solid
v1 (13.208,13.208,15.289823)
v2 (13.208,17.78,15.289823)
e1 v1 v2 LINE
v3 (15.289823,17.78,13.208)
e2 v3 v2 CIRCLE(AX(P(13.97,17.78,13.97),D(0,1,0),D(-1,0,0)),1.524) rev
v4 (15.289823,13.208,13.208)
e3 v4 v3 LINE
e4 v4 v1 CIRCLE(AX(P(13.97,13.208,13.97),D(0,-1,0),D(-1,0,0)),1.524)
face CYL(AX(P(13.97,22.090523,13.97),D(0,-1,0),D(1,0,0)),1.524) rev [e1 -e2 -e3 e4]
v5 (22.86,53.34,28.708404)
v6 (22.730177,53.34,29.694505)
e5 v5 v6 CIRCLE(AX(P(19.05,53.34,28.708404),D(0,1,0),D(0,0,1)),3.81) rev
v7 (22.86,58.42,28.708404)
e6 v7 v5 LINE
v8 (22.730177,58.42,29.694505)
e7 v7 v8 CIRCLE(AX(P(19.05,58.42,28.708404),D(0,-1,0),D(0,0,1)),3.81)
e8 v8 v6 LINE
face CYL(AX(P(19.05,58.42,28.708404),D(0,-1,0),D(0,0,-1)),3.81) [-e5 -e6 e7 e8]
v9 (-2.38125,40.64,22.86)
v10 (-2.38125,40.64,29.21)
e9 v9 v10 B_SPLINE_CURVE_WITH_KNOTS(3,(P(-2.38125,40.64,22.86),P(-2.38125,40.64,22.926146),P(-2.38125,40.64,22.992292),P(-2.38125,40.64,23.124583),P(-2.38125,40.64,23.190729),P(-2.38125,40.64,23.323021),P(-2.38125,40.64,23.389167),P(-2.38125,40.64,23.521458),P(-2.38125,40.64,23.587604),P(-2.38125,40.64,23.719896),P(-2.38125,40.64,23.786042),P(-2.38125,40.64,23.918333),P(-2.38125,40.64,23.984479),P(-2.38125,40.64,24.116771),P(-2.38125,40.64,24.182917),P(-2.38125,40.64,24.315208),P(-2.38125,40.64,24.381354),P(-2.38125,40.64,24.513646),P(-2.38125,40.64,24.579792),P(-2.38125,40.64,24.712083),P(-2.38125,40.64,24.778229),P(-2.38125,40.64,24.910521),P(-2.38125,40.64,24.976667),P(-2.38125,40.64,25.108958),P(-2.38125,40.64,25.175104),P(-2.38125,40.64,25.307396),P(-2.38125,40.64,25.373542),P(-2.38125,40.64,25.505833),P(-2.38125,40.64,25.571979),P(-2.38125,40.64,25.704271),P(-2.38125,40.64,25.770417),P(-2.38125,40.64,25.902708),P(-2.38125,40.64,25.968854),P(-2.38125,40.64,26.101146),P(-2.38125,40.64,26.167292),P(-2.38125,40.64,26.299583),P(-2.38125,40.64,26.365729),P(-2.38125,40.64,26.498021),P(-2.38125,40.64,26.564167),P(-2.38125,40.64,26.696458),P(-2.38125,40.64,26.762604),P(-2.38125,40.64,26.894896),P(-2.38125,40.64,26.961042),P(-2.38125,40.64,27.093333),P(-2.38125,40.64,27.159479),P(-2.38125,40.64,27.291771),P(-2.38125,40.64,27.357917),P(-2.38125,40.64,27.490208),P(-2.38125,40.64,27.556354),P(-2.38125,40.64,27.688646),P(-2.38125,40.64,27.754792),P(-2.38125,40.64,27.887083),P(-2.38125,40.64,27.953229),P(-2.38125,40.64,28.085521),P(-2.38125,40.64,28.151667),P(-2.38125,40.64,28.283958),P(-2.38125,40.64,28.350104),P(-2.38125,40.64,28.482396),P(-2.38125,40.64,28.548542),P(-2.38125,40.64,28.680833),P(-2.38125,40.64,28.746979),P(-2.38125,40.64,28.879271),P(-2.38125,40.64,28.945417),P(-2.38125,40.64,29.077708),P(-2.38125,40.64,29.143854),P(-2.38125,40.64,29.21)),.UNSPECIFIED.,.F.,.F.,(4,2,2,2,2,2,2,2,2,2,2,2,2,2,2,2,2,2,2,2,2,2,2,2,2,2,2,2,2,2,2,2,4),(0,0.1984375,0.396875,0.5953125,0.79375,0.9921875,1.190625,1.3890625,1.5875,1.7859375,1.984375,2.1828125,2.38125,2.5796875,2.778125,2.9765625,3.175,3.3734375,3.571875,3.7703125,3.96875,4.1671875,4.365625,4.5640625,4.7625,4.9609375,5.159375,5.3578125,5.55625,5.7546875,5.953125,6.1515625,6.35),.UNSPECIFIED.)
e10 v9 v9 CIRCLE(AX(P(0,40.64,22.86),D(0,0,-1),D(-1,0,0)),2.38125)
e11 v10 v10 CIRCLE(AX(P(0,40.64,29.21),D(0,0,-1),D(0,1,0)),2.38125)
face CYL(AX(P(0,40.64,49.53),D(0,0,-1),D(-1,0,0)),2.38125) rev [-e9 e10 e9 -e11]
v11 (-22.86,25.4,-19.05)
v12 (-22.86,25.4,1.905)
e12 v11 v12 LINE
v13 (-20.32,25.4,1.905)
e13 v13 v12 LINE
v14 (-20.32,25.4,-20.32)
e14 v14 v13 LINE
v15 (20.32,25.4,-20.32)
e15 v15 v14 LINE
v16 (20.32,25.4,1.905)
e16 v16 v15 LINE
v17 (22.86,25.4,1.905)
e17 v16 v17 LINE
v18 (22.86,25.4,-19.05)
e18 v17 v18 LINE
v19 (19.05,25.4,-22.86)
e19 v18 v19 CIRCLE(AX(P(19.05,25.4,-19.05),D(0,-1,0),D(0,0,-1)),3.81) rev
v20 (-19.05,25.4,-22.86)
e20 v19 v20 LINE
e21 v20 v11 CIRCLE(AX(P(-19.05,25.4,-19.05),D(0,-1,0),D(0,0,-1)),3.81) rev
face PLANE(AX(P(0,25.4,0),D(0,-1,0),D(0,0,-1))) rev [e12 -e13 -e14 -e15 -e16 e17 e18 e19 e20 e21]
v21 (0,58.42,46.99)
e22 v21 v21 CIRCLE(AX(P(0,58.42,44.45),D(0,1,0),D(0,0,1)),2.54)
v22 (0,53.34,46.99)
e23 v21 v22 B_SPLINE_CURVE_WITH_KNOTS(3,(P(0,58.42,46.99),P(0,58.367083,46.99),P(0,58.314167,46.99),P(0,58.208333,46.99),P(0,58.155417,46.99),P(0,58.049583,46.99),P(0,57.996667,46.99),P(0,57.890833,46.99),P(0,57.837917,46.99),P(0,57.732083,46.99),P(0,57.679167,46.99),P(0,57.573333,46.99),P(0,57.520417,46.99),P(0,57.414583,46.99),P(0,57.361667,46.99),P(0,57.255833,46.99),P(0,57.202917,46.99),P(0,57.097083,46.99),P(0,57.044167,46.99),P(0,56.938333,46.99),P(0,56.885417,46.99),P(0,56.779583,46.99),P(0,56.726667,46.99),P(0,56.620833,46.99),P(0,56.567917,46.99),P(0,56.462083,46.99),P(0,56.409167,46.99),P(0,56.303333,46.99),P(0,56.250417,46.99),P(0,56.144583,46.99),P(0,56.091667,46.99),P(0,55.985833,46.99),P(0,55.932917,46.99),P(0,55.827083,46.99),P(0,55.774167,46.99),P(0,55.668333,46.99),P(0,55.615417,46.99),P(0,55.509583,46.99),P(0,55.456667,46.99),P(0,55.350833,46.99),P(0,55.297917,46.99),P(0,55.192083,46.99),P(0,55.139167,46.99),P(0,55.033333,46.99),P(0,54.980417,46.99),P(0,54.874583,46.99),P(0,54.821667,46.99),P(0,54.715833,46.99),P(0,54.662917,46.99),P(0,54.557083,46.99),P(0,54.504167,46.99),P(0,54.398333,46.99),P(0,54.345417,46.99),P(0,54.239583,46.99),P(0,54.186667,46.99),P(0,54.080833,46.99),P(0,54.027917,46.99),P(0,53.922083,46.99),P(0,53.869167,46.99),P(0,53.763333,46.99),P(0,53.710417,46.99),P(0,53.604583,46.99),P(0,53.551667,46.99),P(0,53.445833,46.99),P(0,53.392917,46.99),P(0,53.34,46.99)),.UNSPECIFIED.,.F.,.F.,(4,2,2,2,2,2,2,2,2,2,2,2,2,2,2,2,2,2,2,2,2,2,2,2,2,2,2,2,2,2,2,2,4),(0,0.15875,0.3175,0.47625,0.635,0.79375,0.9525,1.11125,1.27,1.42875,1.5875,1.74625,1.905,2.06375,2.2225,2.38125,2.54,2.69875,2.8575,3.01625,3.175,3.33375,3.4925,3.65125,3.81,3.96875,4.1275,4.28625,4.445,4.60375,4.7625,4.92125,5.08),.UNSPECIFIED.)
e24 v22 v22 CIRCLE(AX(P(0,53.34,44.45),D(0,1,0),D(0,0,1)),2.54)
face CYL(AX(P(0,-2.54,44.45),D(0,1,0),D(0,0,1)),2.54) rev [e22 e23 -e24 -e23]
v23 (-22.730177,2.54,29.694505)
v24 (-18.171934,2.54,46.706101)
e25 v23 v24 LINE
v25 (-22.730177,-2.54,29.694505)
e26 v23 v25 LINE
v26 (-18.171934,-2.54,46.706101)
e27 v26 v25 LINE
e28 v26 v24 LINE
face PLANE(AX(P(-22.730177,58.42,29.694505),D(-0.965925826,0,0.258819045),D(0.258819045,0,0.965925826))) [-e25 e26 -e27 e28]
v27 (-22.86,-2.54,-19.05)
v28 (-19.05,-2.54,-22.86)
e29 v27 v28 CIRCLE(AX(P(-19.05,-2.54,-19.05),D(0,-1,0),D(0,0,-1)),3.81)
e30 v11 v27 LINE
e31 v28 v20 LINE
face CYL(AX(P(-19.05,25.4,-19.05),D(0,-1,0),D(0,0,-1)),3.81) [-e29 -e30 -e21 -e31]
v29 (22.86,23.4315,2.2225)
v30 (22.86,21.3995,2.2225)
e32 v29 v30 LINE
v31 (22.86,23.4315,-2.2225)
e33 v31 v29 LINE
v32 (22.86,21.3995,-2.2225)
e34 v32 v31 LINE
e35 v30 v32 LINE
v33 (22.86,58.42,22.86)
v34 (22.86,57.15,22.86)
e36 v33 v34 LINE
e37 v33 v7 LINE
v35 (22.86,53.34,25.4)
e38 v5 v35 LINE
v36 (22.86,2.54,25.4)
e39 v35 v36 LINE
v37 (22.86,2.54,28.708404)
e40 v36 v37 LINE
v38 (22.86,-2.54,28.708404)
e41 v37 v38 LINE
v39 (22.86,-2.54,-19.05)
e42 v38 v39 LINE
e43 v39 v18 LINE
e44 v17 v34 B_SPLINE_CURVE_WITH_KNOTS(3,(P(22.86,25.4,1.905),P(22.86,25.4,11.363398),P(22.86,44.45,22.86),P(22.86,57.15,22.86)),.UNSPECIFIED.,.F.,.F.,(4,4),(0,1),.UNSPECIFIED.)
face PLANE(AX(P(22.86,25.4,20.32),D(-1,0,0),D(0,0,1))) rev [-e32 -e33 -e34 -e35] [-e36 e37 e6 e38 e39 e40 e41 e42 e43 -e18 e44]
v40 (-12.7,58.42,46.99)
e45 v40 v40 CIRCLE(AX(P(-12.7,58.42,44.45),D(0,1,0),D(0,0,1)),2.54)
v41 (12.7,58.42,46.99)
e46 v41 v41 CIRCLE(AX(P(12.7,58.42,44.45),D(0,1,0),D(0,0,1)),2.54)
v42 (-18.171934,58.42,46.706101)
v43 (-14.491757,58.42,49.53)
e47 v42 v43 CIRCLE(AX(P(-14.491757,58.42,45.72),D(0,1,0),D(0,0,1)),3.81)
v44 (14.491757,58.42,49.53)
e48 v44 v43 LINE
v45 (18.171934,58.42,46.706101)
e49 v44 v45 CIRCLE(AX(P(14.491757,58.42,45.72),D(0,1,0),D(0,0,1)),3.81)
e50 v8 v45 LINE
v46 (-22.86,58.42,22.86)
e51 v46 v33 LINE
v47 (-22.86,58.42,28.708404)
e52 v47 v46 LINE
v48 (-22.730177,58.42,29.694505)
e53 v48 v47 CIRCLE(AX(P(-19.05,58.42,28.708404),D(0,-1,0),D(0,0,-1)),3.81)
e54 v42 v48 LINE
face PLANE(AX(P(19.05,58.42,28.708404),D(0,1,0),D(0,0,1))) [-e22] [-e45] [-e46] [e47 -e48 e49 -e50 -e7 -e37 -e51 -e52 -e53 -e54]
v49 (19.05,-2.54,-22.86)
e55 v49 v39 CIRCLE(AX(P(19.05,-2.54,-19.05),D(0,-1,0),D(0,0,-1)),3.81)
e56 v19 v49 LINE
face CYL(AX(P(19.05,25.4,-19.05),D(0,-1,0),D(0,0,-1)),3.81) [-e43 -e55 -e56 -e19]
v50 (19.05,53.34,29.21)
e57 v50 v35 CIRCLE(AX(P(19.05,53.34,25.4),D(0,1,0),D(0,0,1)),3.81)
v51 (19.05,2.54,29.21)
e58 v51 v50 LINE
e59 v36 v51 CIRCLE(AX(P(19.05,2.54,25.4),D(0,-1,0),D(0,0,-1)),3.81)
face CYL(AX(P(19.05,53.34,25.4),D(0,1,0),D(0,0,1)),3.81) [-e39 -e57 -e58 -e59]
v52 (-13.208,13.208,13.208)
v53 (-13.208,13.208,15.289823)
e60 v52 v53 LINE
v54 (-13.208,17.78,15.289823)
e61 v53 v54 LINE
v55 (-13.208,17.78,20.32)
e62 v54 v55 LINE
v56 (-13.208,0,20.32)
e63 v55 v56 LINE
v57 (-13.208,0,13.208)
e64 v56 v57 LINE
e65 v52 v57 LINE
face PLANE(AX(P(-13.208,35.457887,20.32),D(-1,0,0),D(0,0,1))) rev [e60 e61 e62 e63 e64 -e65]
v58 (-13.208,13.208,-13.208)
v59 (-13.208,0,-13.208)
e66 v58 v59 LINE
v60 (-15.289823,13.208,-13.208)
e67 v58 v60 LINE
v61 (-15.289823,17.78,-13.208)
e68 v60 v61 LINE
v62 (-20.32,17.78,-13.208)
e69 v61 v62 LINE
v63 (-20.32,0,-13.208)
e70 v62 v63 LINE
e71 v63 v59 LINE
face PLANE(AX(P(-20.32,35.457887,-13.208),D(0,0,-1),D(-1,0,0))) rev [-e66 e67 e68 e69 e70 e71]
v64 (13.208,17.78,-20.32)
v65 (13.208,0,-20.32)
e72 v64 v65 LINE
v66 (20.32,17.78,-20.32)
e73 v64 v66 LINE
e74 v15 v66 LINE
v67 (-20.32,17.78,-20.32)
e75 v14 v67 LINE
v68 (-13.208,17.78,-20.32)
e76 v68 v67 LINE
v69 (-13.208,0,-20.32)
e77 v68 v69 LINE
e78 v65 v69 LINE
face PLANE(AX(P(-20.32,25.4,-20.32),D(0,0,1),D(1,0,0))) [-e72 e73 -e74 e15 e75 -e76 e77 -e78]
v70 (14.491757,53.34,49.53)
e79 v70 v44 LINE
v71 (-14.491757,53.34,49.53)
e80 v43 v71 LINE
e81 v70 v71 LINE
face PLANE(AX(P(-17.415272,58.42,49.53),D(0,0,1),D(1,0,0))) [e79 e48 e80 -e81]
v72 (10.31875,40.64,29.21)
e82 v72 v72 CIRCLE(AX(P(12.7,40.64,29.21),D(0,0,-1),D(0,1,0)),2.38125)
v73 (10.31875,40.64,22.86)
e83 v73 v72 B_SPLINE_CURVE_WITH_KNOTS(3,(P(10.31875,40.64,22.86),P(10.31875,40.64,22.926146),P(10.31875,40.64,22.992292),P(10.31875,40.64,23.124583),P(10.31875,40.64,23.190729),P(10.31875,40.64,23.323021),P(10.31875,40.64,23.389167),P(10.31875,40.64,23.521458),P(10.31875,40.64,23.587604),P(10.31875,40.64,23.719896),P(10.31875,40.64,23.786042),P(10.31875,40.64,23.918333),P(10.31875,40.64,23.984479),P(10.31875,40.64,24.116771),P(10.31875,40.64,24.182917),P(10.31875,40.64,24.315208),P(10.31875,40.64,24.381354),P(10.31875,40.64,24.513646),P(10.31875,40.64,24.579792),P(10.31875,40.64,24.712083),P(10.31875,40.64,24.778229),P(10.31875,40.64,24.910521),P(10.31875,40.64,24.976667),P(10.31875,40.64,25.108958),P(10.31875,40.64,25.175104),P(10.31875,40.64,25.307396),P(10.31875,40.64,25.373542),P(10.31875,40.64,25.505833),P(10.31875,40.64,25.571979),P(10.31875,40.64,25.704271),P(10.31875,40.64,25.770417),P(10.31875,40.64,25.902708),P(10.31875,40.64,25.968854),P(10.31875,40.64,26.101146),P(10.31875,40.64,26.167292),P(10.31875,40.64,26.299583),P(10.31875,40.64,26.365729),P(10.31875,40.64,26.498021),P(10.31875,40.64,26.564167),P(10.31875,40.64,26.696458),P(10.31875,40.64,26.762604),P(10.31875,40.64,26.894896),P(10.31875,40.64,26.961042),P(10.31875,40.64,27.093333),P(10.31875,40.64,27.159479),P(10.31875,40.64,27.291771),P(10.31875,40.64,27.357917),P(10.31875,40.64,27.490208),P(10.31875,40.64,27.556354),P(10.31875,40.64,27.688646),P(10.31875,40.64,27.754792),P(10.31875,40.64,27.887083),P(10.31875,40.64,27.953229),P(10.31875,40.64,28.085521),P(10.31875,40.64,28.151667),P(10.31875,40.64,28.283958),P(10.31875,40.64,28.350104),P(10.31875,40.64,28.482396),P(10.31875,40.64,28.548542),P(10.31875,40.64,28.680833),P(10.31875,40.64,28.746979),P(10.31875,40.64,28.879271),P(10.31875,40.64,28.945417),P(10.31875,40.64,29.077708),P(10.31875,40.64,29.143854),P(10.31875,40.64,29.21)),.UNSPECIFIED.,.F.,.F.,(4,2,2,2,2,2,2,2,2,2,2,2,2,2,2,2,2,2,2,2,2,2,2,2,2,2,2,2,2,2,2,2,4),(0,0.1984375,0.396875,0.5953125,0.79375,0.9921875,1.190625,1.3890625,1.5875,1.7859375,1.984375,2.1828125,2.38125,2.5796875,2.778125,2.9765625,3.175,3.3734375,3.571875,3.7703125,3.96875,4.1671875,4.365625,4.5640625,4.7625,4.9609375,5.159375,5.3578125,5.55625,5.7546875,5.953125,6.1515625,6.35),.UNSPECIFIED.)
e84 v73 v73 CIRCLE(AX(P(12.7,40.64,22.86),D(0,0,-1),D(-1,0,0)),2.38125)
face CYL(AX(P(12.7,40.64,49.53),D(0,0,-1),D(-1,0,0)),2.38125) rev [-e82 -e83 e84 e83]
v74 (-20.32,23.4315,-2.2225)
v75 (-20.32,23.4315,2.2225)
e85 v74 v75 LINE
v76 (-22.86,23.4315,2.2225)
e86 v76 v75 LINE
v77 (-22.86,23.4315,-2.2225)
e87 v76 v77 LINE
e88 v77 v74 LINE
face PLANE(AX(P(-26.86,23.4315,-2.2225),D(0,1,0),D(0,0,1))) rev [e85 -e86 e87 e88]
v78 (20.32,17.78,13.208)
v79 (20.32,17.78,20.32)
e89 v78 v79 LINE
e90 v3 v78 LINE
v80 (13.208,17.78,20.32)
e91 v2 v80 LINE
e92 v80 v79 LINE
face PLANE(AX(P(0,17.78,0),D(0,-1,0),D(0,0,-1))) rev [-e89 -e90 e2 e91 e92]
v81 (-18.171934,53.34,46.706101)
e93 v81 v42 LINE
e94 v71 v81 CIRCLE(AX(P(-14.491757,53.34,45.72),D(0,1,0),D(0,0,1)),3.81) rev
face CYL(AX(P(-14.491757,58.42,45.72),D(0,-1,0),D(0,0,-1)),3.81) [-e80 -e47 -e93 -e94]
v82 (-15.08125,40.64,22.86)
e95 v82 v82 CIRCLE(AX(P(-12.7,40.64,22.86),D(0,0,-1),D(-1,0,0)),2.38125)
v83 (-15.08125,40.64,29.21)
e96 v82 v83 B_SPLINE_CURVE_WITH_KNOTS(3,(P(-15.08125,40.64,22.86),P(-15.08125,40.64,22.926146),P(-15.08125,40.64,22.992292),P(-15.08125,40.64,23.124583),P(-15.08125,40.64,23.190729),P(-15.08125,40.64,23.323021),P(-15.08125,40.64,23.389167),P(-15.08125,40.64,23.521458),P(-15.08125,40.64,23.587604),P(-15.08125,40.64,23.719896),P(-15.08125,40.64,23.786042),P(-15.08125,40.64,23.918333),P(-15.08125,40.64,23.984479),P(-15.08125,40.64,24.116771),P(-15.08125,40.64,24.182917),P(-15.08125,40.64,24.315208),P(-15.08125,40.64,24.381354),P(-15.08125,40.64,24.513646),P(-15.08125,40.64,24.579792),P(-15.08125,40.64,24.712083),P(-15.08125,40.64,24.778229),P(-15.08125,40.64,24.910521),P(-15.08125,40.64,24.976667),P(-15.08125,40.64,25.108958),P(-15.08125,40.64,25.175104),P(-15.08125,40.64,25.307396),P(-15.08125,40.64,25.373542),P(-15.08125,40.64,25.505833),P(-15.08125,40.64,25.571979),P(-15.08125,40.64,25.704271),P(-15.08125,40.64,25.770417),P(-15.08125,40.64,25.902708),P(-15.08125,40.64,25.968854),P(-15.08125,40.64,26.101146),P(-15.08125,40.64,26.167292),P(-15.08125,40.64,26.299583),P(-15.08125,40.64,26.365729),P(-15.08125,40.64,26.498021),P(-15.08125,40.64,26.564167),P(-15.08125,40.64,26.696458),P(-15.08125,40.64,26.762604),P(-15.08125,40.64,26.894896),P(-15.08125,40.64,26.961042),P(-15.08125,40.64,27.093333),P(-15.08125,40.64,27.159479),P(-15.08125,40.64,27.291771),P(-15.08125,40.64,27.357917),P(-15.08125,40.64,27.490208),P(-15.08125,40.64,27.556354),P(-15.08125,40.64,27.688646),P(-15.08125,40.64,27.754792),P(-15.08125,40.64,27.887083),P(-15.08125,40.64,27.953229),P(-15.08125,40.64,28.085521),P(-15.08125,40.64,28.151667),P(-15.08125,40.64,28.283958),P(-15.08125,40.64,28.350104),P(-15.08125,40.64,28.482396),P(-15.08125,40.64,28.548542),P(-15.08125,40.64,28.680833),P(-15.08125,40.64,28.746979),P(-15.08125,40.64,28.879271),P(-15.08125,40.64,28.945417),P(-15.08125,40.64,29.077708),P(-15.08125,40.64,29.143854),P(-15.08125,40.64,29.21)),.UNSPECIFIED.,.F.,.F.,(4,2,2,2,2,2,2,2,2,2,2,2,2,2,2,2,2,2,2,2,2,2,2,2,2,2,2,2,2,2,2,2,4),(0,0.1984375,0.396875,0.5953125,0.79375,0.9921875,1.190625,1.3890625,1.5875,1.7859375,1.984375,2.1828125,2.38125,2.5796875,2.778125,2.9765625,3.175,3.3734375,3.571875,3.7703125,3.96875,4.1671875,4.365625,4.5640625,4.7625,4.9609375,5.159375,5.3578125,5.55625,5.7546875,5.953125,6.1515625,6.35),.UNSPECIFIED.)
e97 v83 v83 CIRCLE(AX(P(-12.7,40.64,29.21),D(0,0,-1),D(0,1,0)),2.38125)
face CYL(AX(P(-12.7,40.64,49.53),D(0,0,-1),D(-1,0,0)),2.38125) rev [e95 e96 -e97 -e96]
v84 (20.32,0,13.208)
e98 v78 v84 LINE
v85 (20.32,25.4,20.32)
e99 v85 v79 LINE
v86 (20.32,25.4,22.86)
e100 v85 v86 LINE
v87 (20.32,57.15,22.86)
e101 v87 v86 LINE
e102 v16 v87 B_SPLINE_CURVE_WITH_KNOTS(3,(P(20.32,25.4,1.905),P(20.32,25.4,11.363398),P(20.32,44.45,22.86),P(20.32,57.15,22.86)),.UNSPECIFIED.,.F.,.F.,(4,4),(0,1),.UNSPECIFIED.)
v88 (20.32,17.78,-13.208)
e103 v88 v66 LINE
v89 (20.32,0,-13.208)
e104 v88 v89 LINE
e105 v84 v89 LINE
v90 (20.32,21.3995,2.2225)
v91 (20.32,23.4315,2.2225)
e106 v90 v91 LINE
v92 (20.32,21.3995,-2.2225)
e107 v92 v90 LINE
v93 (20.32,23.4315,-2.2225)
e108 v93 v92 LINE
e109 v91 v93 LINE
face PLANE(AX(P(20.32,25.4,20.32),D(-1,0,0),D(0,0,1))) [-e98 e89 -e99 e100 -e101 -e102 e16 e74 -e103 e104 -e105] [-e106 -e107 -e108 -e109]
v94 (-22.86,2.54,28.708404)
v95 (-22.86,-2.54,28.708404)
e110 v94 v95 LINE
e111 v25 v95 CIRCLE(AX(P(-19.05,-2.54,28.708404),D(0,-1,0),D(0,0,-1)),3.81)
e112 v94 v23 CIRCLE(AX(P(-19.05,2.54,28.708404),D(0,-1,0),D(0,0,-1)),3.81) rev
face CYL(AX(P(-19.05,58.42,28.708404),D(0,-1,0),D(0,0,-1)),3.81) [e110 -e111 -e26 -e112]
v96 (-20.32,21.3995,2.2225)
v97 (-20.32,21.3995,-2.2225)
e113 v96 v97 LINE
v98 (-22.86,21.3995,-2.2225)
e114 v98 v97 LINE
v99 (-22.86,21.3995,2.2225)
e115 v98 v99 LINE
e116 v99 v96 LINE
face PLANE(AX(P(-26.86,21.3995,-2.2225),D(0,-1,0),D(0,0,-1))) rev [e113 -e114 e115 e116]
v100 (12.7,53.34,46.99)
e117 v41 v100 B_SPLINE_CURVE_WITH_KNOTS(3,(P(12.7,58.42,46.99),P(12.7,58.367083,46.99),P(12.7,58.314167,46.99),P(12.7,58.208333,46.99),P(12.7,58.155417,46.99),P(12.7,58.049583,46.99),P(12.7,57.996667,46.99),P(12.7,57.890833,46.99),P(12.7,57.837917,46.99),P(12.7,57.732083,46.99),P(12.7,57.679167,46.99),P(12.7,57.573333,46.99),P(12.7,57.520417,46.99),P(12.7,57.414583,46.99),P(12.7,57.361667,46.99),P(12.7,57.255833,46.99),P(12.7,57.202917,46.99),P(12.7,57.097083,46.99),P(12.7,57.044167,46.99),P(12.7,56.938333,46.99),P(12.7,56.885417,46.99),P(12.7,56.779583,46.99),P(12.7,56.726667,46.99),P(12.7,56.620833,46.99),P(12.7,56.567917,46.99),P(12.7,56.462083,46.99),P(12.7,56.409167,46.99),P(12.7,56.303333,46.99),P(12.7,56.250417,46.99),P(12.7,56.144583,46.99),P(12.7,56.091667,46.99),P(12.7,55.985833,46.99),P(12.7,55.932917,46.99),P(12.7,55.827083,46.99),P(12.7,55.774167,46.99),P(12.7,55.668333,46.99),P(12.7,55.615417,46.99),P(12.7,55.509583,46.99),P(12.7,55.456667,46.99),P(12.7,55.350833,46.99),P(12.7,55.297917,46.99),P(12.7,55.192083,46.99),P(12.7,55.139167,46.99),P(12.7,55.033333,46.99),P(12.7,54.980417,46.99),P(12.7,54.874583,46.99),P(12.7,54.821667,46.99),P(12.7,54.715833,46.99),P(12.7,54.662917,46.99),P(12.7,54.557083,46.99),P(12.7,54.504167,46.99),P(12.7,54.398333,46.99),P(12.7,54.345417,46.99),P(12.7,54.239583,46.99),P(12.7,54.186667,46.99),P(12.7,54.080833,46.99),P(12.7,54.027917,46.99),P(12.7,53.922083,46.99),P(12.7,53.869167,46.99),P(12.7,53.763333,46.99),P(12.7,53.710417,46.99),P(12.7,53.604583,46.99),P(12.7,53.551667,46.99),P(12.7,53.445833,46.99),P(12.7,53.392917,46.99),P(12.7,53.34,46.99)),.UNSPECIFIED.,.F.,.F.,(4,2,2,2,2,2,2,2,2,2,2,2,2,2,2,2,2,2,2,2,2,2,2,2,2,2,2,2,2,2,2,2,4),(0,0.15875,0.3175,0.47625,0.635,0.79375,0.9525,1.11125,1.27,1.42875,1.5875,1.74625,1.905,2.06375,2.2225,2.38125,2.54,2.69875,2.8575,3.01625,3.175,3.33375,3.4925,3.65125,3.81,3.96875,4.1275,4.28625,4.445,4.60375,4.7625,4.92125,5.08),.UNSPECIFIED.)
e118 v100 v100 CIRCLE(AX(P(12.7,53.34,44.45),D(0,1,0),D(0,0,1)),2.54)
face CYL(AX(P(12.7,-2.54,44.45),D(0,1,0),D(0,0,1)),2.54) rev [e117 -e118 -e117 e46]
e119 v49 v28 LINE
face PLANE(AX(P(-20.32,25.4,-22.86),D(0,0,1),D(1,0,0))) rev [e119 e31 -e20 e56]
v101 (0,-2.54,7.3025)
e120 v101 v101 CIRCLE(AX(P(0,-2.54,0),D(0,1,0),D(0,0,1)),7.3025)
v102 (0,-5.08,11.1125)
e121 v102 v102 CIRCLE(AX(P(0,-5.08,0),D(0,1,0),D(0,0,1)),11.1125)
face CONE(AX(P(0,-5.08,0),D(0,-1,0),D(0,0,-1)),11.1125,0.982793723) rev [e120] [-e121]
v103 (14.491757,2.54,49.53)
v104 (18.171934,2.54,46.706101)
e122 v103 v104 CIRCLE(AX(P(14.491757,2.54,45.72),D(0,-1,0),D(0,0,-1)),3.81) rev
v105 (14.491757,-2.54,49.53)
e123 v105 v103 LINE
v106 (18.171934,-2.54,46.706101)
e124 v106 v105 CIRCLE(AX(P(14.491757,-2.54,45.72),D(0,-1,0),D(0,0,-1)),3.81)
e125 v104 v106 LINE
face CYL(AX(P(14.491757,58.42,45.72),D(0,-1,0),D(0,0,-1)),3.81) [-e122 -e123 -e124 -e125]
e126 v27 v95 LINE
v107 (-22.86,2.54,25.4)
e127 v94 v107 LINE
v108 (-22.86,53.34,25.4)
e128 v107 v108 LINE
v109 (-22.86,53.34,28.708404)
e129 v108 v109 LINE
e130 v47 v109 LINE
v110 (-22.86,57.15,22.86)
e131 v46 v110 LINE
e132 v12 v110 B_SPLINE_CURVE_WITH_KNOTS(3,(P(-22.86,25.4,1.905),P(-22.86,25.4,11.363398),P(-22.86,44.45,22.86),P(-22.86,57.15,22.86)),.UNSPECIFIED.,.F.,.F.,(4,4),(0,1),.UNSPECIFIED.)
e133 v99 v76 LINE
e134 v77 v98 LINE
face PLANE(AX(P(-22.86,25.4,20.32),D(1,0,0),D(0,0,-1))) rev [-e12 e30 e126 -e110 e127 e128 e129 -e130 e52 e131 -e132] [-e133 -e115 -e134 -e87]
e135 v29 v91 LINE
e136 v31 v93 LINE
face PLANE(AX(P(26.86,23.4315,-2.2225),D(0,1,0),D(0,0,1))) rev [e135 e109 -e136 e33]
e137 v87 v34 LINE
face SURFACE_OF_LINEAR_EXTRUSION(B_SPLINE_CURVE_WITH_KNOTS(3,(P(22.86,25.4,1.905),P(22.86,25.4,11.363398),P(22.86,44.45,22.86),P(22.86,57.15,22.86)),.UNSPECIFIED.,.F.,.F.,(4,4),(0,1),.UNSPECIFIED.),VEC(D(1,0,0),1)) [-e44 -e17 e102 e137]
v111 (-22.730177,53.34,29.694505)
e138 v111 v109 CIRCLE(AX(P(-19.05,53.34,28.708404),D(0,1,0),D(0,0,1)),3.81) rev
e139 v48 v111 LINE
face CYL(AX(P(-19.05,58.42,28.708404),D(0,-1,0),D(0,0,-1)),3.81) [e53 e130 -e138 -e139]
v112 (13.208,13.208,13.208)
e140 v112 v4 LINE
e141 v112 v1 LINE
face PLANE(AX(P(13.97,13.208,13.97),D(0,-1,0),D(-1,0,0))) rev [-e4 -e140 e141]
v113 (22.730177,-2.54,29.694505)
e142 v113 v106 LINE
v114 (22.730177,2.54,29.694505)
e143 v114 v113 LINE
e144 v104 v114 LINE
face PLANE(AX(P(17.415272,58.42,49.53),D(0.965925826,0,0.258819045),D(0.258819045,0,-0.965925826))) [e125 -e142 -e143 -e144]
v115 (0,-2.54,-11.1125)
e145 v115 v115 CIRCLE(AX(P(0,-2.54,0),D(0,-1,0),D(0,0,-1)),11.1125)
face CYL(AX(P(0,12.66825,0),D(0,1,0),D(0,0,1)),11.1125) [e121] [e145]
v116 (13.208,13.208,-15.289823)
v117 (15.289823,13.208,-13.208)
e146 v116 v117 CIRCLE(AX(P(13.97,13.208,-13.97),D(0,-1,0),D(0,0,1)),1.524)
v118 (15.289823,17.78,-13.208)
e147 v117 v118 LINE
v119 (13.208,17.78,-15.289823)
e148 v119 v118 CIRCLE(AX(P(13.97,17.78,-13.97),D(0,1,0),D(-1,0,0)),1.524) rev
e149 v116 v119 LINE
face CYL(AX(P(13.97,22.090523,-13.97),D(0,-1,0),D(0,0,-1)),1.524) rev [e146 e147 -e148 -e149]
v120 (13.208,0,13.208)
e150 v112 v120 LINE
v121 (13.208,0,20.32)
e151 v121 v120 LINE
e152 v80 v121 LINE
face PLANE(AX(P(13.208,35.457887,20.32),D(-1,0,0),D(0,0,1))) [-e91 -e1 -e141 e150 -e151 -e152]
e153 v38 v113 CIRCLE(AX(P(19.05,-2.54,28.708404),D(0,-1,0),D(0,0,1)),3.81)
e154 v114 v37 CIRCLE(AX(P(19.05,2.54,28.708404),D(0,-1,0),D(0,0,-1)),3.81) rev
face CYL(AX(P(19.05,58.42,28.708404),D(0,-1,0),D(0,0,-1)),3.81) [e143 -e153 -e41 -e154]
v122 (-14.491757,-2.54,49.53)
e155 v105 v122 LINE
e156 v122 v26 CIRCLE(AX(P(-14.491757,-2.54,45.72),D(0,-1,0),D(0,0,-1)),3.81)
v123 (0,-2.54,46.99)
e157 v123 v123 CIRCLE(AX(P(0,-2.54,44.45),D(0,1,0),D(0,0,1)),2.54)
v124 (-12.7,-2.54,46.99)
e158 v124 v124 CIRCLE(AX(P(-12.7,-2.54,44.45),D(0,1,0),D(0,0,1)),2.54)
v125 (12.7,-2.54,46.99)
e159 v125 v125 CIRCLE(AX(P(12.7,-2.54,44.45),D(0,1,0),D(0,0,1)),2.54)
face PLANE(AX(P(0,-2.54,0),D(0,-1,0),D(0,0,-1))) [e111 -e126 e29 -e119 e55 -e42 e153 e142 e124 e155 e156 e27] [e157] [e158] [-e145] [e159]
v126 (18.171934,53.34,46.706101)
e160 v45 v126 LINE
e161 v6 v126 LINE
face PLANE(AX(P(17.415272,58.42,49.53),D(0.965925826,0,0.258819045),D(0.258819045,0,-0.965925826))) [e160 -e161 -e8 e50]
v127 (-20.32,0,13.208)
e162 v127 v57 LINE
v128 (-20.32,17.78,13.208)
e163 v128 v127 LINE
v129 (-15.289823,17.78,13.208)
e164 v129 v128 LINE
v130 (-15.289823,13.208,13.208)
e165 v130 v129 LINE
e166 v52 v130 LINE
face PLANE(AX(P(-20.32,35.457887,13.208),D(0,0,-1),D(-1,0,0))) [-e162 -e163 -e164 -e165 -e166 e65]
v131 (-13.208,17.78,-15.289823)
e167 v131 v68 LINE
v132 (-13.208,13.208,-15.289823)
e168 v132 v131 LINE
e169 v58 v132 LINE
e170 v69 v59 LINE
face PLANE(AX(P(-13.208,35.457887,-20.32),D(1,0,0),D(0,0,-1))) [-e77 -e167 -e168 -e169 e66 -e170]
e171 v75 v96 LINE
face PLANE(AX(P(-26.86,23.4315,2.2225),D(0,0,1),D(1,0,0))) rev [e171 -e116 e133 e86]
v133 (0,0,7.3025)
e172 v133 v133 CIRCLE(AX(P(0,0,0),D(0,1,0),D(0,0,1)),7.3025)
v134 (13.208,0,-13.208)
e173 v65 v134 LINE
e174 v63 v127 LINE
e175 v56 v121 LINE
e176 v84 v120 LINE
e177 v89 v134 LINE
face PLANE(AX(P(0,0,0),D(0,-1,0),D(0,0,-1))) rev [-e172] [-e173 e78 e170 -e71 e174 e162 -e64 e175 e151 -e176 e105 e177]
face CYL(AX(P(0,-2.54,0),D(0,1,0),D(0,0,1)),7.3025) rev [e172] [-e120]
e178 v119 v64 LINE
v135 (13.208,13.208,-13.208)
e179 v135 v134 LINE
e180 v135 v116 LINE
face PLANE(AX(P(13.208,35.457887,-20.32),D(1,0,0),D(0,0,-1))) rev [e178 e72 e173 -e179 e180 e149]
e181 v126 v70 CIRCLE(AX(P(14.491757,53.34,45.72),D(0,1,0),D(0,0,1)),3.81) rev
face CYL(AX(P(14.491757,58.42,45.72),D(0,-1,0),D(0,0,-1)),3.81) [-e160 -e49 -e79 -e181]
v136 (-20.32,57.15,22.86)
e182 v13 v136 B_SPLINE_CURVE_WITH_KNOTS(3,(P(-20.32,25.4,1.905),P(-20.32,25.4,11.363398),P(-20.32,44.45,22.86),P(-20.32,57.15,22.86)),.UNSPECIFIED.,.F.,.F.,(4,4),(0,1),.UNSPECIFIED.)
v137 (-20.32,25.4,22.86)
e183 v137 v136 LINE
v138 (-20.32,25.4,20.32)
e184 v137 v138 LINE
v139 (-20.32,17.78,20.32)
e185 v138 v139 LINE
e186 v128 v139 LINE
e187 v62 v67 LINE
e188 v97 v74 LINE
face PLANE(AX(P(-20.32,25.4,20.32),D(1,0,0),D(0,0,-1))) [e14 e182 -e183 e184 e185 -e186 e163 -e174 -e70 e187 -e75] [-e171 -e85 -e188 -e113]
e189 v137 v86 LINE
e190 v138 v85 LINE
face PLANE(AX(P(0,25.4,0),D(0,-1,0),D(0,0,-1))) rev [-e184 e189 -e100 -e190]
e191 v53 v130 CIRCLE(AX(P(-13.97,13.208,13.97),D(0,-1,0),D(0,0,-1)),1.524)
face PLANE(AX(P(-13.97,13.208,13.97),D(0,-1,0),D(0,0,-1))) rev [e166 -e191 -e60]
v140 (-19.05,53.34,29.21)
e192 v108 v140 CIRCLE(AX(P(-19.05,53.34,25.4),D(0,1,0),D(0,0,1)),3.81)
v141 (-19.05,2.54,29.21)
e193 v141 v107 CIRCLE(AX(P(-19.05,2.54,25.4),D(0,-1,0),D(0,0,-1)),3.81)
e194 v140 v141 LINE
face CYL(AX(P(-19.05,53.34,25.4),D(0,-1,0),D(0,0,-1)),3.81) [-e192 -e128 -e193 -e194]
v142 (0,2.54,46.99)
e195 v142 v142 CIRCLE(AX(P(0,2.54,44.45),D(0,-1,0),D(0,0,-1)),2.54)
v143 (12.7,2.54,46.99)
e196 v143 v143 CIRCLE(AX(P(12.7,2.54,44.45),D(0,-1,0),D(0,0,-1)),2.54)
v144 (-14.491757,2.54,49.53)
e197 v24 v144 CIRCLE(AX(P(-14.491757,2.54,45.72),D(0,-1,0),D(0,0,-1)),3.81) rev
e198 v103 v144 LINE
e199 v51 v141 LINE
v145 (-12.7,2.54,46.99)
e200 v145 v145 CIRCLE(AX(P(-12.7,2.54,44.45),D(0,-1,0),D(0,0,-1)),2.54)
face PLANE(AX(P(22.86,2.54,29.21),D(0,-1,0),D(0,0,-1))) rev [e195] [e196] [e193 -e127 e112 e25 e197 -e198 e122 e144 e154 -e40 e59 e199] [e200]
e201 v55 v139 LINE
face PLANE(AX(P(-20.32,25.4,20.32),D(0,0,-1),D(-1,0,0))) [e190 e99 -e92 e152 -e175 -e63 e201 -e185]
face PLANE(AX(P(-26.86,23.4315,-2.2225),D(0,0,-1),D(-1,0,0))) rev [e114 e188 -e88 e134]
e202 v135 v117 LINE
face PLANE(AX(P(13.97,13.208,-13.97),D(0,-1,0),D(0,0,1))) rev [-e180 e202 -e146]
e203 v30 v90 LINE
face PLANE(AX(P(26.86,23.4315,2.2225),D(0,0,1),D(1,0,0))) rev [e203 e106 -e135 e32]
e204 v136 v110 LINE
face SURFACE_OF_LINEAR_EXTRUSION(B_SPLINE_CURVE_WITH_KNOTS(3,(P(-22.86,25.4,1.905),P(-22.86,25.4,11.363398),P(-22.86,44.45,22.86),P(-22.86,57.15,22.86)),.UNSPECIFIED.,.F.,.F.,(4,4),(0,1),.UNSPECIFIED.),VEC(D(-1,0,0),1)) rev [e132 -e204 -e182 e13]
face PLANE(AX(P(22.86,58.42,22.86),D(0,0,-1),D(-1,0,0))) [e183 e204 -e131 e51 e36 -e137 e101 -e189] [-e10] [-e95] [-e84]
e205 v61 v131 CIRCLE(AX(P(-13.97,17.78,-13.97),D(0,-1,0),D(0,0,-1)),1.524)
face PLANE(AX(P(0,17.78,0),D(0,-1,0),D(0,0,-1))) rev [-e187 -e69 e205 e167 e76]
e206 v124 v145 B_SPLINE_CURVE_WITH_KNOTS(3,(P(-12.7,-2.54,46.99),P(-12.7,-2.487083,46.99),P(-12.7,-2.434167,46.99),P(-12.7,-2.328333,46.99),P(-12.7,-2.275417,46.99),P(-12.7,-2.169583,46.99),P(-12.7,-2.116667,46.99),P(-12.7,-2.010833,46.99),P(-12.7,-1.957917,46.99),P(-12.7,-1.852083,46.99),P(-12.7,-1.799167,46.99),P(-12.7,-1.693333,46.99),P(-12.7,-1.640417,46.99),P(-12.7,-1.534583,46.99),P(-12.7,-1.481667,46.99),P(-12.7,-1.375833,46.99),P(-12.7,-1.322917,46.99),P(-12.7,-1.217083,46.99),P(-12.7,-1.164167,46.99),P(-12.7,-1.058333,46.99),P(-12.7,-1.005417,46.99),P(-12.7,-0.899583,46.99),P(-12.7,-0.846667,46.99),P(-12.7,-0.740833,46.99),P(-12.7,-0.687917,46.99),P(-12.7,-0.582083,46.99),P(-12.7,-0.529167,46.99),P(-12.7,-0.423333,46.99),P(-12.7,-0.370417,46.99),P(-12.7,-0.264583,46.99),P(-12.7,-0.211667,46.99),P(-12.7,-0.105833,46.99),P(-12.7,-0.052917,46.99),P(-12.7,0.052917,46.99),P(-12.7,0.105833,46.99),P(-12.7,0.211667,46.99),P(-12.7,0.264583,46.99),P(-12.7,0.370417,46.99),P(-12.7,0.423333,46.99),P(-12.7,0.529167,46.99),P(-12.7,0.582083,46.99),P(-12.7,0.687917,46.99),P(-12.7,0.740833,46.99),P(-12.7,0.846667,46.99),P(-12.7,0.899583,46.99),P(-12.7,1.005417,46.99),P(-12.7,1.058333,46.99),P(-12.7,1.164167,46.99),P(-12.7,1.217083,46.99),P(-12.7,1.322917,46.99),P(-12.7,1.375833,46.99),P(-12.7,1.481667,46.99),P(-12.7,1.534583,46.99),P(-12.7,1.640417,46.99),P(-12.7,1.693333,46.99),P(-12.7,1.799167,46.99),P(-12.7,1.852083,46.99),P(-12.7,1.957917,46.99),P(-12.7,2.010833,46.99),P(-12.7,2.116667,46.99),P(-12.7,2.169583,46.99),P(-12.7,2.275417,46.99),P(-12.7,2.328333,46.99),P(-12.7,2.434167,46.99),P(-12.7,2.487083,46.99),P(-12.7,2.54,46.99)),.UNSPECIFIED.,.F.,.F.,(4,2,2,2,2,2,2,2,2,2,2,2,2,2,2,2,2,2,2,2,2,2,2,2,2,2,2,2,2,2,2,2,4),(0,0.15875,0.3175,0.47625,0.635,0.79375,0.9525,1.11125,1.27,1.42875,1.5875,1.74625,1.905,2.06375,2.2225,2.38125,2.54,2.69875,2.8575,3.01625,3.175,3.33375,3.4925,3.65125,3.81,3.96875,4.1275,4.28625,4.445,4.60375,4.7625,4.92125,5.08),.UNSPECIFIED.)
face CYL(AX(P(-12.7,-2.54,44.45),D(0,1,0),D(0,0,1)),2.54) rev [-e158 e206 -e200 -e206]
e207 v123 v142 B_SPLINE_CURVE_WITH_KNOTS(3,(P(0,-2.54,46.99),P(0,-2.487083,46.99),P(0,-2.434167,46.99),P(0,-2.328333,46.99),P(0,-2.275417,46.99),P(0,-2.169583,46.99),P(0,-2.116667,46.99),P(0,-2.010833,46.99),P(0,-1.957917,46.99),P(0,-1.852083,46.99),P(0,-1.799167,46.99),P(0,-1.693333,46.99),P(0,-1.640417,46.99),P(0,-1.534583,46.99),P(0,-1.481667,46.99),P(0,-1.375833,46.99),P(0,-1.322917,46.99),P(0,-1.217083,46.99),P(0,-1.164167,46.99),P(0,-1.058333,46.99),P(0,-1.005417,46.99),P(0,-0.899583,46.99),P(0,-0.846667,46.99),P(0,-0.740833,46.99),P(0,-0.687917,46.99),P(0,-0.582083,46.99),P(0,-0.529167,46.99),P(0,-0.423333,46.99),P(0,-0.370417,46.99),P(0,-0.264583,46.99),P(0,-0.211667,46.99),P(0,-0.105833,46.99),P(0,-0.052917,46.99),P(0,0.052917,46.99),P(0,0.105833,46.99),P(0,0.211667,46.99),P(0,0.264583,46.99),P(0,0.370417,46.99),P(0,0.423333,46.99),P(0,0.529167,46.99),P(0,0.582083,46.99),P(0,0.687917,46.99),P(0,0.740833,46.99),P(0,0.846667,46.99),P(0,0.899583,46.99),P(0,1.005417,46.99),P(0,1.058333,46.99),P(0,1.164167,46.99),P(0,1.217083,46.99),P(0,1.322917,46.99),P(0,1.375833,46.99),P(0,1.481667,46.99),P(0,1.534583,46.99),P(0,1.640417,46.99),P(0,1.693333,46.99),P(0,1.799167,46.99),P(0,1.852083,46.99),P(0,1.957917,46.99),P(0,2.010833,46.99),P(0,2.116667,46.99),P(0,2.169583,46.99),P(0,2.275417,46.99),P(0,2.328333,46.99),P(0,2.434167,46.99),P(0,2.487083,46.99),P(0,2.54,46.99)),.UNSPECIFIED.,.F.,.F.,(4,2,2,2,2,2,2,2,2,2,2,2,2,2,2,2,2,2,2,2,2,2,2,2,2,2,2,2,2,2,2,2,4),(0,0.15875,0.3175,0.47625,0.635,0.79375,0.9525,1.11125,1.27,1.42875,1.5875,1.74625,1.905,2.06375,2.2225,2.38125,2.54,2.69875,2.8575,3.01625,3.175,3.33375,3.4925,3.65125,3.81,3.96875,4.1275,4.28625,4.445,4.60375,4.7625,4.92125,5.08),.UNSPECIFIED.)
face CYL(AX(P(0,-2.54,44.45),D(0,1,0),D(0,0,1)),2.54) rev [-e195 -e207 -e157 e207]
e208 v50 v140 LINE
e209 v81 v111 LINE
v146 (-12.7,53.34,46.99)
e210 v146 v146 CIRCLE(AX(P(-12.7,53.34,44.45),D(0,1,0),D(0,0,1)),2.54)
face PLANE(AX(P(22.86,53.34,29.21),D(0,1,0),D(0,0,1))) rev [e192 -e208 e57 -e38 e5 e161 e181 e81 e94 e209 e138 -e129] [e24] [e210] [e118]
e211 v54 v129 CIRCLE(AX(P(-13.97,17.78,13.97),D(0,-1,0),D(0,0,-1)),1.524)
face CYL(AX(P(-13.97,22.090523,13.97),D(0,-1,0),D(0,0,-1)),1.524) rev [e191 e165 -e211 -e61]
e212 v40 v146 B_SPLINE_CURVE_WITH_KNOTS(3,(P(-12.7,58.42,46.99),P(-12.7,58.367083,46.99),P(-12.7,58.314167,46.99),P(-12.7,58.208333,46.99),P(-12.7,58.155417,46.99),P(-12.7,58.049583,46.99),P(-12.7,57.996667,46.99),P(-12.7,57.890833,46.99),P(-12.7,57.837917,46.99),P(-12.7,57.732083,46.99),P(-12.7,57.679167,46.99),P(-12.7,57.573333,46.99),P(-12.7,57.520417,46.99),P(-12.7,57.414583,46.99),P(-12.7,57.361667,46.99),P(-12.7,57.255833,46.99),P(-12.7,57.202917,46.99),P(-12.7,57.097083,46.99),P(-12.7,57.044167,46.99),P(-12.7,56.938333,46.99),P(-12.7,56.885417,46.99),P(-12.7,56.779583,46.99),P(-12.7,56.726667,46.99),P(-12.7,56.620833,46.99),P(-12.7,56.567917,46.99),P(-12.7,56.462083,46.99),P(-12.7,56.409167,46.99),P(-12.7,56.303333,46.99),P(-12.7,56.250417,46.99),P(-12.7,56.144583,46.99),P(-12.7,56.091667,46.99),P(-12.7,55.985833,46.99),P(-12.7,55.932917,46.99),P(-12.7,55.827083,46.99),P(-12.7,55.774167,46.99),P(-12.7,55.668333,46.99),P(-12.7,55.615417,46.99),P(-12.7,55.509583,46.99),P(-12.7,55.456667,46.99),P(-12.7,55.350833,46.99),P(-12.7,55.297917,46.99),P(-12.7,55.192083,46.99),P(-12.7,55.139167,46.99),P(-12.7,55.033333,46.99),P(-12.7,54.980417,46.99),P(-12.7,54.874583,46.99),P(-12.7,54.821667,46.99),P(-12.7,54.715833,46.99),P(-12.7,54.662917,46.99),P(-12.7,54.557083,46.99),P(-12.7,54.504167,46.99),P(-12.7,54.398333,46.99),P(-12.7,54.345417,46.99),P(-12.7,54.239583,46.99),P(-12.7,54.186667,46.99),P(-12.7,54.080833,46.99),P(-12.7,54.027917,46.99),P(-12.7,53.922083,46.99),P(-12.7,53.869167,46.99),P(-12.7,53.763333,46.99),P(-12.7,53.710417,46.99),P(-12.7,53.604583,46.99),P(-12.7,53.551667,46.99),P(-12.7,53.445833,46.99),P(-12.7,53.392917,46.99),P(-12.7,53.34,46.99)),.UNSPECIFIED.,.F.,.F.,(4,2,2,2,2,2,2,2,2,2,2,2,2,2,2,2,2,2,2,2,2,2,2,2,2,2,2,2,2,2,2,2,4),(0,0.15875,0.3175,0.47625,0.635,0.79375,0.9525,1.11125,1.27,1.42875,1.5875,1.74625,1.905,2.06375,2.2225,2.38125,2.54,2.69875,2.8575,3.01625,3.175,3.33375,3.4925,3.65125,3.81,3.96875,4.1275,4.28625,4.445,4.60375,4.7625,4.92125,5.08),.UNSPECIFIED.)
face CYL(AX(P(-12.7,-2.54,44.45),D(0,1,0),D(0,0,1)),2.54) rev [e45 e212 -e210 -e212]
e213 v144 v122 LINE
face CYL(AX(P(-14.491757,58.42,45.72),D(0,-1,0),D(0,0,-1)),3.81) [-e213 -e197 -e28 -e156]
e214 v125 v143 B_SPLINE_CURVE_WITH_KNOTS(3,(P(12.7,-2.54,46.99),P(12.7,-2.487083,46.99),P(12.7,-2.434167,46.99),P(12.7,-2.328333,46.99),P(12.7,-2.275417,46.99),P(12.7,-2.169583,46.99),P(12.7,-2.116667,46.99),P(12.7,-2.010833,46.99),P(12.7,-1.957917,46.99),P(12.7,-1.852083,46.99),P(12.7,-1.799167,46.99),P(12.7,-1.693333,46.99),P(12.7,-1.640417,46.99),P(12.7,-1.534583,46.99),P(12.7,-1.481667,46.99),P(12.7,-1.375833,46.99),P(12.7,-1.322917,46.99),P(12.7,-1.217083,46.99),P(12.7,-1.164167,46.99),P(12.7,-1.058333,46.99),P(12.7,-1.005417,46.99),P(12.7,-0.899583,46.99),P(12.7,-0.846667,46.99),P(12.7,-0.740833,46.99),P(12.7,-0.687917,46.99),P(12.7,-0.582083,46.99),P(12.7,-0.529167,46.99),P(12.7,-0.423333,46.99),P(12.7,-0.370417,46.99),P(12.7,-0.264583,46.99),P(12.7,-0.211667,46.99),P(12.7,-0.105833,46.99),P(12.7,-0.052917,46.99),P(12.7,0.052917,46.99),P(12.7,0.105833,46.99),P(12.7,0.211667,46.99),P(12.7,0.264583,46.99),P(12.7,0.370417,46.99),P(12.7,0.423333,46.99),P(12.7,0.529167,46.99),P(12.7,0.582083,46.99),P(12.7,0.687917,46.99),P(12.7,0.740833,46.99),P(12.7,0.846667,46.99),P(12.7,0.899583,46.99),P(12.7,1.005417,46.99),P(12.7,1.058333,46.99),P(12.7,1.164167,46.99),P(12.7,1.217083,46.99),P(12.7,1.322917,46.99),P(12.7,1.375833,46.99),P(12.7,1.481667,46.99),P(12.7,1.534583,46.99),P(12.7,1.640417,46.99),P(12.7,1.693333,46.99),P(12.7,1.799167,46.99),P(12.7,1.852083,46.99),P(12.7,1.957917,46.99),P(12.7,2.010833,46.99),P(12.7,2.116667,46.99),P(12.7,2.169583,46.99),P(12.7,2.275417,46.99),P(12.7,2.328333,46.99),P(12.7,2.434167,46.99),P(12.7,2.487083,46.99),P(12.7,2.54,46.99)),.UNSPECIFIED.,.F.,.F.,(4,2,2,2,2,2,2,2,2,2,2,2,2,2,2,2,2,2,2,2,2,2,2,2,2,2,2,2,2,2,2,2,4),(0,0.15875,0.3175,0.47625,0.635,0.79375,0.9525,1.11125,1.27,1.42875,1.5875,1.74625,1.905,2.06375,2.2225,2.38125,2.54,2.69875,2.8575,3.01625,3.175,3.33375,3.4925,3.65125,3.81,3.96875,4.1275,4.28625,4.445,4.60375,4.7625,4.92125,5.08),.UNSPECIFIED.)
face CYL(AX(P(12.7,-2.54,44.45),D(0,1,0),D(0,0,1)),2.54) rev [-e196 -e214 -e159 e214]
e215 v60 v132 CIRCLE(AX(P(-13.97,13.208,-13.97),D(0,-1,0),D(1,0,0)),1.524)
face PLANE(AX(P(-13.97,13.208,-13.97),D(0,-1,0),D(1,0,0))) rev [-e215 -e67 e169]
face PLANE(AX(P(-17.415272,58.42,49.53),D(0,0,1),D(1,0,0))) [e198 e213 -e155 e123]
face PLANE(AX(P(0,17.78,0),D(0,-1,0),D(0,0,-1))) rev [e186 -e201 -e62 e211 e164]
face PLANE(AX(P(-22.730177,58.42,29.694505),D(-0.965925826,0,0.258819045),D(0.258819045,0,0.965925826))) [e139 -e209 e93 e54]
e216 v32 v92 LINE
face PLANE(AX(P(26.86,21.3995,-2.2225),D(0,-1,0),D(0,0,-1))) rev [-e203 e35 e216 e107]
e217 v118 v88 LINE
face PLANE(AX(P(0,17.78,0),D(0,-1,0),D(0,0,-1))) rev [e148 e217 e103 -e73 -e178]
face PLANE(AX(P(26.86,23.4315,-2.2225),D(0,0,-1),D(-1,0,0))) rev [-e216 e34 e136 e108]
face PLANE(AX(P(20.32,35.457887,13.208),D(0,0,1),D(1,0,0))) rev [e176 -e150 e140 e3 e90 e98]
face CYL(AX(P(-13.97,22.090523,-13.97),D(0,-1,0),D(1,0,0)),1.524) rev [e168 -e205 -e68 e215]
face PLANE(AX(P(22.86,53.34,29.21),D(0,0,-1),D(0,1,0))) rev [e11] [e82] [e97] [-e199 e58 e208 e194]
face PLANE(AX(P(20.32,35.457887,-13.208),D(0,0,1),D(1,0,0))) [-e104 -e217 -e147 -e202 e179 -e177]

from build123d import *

# Parameters (mm, degrees)
SKETCH1_W           = 40.64
SKETCH1_H           = 40.64
BOSS_EXTRUDE1_DEPTH = 25.4
SHELL1_T            = 2.54
SKETCH2_W           = 7.112
SKETCH2_H           = 7.112
BOSS_EXTRUDE2_DEPTH = 17.78
BOSS_EXTRUDE3_DEPTH = 60.96
SKETCH5_W           = 20.32
SKETCH5_H           = 50.8
CUT_EXTRUDE1_DEPTH  = 90.198854813
SKETCH6_R           = 2.54
CUT_EXTRUDE2_DEPTH  = 82.804169209
FILLET1_R           = 3.81
SKETCH10_R          = 1.524
CUT_EXTRUDE4_DEPTH  = 4.572
CIRPATTERN1_COUNT   = 4
SKETCH11_R          = 7.3025
CUT_EXTRUDE5_DEPTH  = 80.929324406
RIB1_START          = -2.54
RIB1_DEPTH          = 2.54
SKETCH19_R          = 2.38125
CUT_EXTRUDE6_DEPTH  = 78.625990598
SKETCH20_W          = 2.032
SKETCH20_H          = 4.445


with BuildPart() as part:
    # Sketch1 → Boss-Extrude1 (new body)
    with BuildSketch(Plane(origin=(0, 0, 0), x_dir=(1, 0, 0), z_dir=(0, 1, 0))):
        Rectangle(SKETCH1_W, SKETCH1_H)
    extrude(amount=BOSS_EXTRUDE1_DEPTH)

    # Shell1
    shell1_openings = [part.faces().sort_by_distance(p)[0] for p in [
        (0, 25.4, 0),
    ]]
    offset(amount=SHELL1_T, openings=shell1_openings, kind=Kind.INTERSECTION)

    # Sketch2 → Boss-Extrude2 (add)
    with BuildSketch(Plane(origin=(0, 0, 0), x_dir=(1, 0, 0), z_dir=(0, 1, 0))):
        with Locations((-16.764, 16.764)):
            Rectangle(SKETCH2_W, SKETCH2_H)
    boss_extrude2 = extrude(amount=BOSS_EXTRUDE2_DEPTH)

    # Sketch3 → Boss-Extrude3 (add)
    with BuildSketch(Plane.XZ.offset(2.54)):
        with BuildLine():
            Line((-22.730177398, 29.694504546), (-17.41527241, 49.53))
            Line((-17.41527241, 49.53), (17.41527241, 49.53))
            Line((17.41527241, 49.53), (22.730177398, 29.694504546))
            ThreePointArc((22.730177398, 29.694504546), (22.827404922, 29.205708777), (22.86, 28.708403984))
            Line((22.86, 28.708403984), (22.86, 22.86))
            Line((22.86, 22.86), (-22.86, 22.86))
            Line((-22.86, 22.86), (-22.86, 28.708403984))
            ThreePointArc((-22.86, 28.708403984), (-22.827404922, 29.205708777), (-22.730177398, 29.694504546))
        make_face()
    extrude(amount=-BOSS_EXTRUDE3_DEPTH)

    # Sketch5 → Cut-Extrude1 (cut, through all)
    with BuildSketch(Plane.ZY.offset(22.86)):
        with Locations((39.37, 27.94)):
            Rectangle(SKETCH5_W, SKETCH5_H)
    extrude(amount=-CUT_EXTRUDE1_DEPTH, mode=Mode.SUBTRACT)

    # Sketch6 → Cut-Extrude2 (cut, through all)
    with BuildSketch(Plane(origin=(0, 58.42, 0), x_dir=(1, 0, 0), z_dir=(0, 1, 0))):
        with Locations(Location((-12.7, -44.45, 0), (0, 0, 270))):
            Circle(SKETCH6_R)
        with Locations(Location((0, -44.45, 0), (0, 0, 270))):
            Circle(SKETCH6_R)
        with Locations(Location((12.7, -44.45, 0), (0, 0, 270))):
            Circle(SKETCH6_R)
    extrude(amount=-CUT_EXTRUDE2_DEPTH, mode=Mode.SUBTRACT)

    # Fillet1
    # the kernel refuses this fillet: 3.81 mm, written as the material it takes off along each edge
    with BuildSketch(Plane(origin=(-17.41527241, 46.03121044, 49.53), x_dir=(-0.25881904510252424, 0, -0.9659258262890673), z_dir=(0, 1, 0)), Plane(origin=(17.41527241, 46.03121044, 49.53), x_dir=(-1, 0, 0), z_dir=(0, 1, 0)), Plane(origin=(-17.41527241, -9.84878956, 49.53), x_dir=(-0.25881904510252424, 0, -0.9659258262890673), z_dir=(0, 1, 0)), Plane(origin=(17.41527241, -9.84878956, 49.53), x_dir=(-1, 0, 0), z_dir=(0, 1, 0))) as fillet1_piece_1:
        with BuildLine():
            CenterArc((FILLET1_R * 0.767326987979, -FILLET1_R), FILLET1_R, 90, 75)
            Line((-FILLET1_R * 0.19859883831, -FILLET1_R * 0.741180954897), (0, 0))
            Line((0, 0), (FILLET1_R * 0.767326987979, 0))
        make_face()
    extrude(amount=19.697579121, mode=Mode.SUBTRACT)
    with BuildSketch(Plane(origin=(-22.826837491, 53.34, 29.21), x_dir=(-0.008703740786851863, 0, -0.999962121730776), z_dir=(0, -1, 0))) as fillet1_piece_2:
        with BuildLine():
            CenterArc((3.776983069, 3.809855684), FILLET1_R, 180.49869391, 90)
            Line((-0.032872615, 3.776694431), (-0.413858183, 3.773378306))
            Line((-0.413858183, 3.773378306), (-0.380985568, -0.003316125))
            Line((-0.380985568, -0.003316125), (-0.04687044, -0.378106019))
            ThreePointArc((-0.04687044, -0.378106019), (0.505181779, -0.409781059), (3.813460447, -0.380985568))
            Line((3.813460447, -0.380985568), (3.810144322, 0))
        make_face()
    extrude(amount=50.8, mode=Mode.SUBTRACT)
    with BuildSketch(Plane(origin=(22.826837491, 53.34, 29.21), x_dir=(0.008703740786853719, 0, -0.999962121730776), z_dir=(0, -1, 0))) as fillet1_piece_3:
        with BuildLine():
            CenterArc((3.776983069, -3.809855684), FILLET1_R, 89.50130609, 90)
            Line((-0.032872615, -3.776694431), (-0.413858183, -3.773378306))
            Line((-0.413858183, -3.773378306), (-0.380985568, 0.003316125))
            Line((-0.380985568, 0.003316125), (-0.04687044, 0.378106019))
            ThreePointArc((-0.04687044, 0.378106019), (0.505181779, 0.409781059), (3.813460447, 0.380985568))
            Line((3.813460447, 0.380985568), (3.810144322, 0))
        make_face()
    extrude(amount=50.8, mode=Mode.SUBTRACT)
    with BuildSketch(Plane(origin=(-22.86, -12.065, -22.86), x_dir=(1, 0, 0), z_dir=(0, 1, 0))) as fillet1_piece_4:
        with BuildLine():
            CenterArc((FILLET1_R, -FILLET1_R), FILLET1_R, 90, 90)
            Line((0, -FILLET1_R), (0, 0))
            Line((0, 0), (FILLET1_R, 0))
        make_face()
    extrude(amount=46.99, mode=Mode.SUBTRACT)
    with BuildSketch(Plane(origin=(22.86, -12.065, -22.86), x_dir=(-1, 0, 0), z_dir=(0, 1, 0))) as fillet1_piece_5:
        with BuildLine():
            CenterArc((FILLET1_R, FILLET1_R), FILLET1_R, 180, 90)
            Line((0, FILLET1_R), (0, 0))
            Line((0, 0), (FILLET1_R, 0))
        make_face()
    extrude(amount=46.99, mode=Mode.SUBTRACT)

    # Sketch10 → Cut-Extrude4 (cut)
    with BuildSketch(Plane.XZ.offset(-13.208)):
        with Locations((-13.97, -13.97)):
            Circle(SKETCH10_R)
    cut_extrude4 = extrude(amount=-CUT_EXTRUDE4_DEPTH, mode=Mode.SUBTRACT)

    # CirPattern1: Boss-Extrude2, Cut-Extrude4 ×4 about axis
    cirpattern1_axis = Axis((0, 0, 0), (0, 1, 0))
    add([boss_extrude2.rotate(cirpattern1_axis, i * 360 / CIRPATTERN1_COUNT) for i in range(1, CIRPATTERN1_COUNT)])
    add([cut_extrude4.rotate(cirpattern1_axis, i * 360 / CIRPATTERN1_COUNT) for i in range(1, CIRPATTERN1_COUNT)], mode=Mode.SUBTRACT)

    # Sketch11 → Cut-Extrude5 (cut, through all)
    with BuildSketch(Plane(origin=(0, 0, 0), x_dir=(1, 0, 0), z_dir=(0, 1, 0))):
        with Locations(Location((0, 0, 0), (0, 0, 270))):
            Circle(SKETCH11_R)
    extrude(amount=-CUT_EXTRUDE5_DEPTH, mode=Mode.SUBTRACT)

    # Sketch12 → Revolve1 (revolve)
    with BuildSketch(Plane.XY, mode=Mode.PRIVATE) as revolve1_sk:
        Polygon((-11.1125, -2.54), (-11.1125, -5.08), (-7.3025, -2.54), align=None)
    revolve(revolve1_sk.sketch.rotate(Axis((0, 12.66825, 0), (0, -1, 0)), 270), axis=Axis((0, 12.66825, 0), (0, -1, 0)))

    # Rib1: read off the stored shape, not the designer's step
    # Rib1 outline → Rib1 (add)
    with BuildSketch(Plane.ZY.offset(22.86).offset(RIB1_START)):
        with BuildLine():
            add(Edge.make_bspline(
                [(1.905, 25.4), (11.363397975, 25.4), (22.86, 44.45), (22.86, 57.15)],
                knots=[0, 0, 0, 0, 1, 1, 1, 1], degree=3))
            Line((1.905, 25.4), (22.86, 25.4))
            Line((22.86, 25.4), (22.86, 57.15))
        make_face()
    rib1 = extrude(amount=RIB1_DEPTH)

    # Mirror2: Rib1 across plane
    add(rib1.mirror(Plane(origin=(0, 0, 0), x_dir=(0, 0, 1), z_dir=(1, 0, 0))))

    # Sketch19 → Cut-Extrude6 (cut, through all)
    with BuildSketch(Plane(origin=(0, 0, 22.86), x_dir=(-1, 0, 0), z_dir=(0, 0, -1))):
        with Locations((-12.7, 40.64)):
            Circle(SKETCH19_R)
        with Locations((12.7, 40.64)):
            Circle(SKETCH19_R)
        with Locations((0, 40.64)):
            Circle(SKETCH19_R)
    extrude(amount=-CUT_EXTRUDE6_DEPTH, mode=Mode.SUBTRACT)

    # Cut-Sweep1: sweep along a path in Sketch21
    with BuildLine() as cut_sweep1_path:  # in the path sketch's own coordinates; laid on its plane below (add() does not lay a ready-made edge on the line's plane)
        Line((-22.86, 22.4155), (-19.05, 22.4155))
        add(Edge.make_bspline(
            [(-19.05, 22.4155), (-16.933333333, 22.4155), (-15.24, 23.791333333), (-15.24, 25.273)],
            knots=[0, 0, 0, 0, 1, 1, 1, 1], degree=3))
    # Sketch20 → Cut-Sweep1 (sweep, cut)
    with BuildSketch(Plane(origin=(0, 25.273, 0), x_dir=(1, 0, 0), z_dir=(0, 1, 0))):
        with Locations((-15.24, 0)):
            Rectangle(SKETCH20_W, SKETCH20_H)
    cut_sweep1 = sweep(path=Plane.XY * cut_sweep1_path.line, mode=Mode.SUBTRACT)

    # Mirror4: Cut-Sweep1 across plane
    add(cut_sweep1.mirror(Plane(origin=(0, 0, 0), x_dir=(0, 0, 1), z_dir=(1, 0, 0))), mode=Mode.SUBTRACT)


solid = part.part
